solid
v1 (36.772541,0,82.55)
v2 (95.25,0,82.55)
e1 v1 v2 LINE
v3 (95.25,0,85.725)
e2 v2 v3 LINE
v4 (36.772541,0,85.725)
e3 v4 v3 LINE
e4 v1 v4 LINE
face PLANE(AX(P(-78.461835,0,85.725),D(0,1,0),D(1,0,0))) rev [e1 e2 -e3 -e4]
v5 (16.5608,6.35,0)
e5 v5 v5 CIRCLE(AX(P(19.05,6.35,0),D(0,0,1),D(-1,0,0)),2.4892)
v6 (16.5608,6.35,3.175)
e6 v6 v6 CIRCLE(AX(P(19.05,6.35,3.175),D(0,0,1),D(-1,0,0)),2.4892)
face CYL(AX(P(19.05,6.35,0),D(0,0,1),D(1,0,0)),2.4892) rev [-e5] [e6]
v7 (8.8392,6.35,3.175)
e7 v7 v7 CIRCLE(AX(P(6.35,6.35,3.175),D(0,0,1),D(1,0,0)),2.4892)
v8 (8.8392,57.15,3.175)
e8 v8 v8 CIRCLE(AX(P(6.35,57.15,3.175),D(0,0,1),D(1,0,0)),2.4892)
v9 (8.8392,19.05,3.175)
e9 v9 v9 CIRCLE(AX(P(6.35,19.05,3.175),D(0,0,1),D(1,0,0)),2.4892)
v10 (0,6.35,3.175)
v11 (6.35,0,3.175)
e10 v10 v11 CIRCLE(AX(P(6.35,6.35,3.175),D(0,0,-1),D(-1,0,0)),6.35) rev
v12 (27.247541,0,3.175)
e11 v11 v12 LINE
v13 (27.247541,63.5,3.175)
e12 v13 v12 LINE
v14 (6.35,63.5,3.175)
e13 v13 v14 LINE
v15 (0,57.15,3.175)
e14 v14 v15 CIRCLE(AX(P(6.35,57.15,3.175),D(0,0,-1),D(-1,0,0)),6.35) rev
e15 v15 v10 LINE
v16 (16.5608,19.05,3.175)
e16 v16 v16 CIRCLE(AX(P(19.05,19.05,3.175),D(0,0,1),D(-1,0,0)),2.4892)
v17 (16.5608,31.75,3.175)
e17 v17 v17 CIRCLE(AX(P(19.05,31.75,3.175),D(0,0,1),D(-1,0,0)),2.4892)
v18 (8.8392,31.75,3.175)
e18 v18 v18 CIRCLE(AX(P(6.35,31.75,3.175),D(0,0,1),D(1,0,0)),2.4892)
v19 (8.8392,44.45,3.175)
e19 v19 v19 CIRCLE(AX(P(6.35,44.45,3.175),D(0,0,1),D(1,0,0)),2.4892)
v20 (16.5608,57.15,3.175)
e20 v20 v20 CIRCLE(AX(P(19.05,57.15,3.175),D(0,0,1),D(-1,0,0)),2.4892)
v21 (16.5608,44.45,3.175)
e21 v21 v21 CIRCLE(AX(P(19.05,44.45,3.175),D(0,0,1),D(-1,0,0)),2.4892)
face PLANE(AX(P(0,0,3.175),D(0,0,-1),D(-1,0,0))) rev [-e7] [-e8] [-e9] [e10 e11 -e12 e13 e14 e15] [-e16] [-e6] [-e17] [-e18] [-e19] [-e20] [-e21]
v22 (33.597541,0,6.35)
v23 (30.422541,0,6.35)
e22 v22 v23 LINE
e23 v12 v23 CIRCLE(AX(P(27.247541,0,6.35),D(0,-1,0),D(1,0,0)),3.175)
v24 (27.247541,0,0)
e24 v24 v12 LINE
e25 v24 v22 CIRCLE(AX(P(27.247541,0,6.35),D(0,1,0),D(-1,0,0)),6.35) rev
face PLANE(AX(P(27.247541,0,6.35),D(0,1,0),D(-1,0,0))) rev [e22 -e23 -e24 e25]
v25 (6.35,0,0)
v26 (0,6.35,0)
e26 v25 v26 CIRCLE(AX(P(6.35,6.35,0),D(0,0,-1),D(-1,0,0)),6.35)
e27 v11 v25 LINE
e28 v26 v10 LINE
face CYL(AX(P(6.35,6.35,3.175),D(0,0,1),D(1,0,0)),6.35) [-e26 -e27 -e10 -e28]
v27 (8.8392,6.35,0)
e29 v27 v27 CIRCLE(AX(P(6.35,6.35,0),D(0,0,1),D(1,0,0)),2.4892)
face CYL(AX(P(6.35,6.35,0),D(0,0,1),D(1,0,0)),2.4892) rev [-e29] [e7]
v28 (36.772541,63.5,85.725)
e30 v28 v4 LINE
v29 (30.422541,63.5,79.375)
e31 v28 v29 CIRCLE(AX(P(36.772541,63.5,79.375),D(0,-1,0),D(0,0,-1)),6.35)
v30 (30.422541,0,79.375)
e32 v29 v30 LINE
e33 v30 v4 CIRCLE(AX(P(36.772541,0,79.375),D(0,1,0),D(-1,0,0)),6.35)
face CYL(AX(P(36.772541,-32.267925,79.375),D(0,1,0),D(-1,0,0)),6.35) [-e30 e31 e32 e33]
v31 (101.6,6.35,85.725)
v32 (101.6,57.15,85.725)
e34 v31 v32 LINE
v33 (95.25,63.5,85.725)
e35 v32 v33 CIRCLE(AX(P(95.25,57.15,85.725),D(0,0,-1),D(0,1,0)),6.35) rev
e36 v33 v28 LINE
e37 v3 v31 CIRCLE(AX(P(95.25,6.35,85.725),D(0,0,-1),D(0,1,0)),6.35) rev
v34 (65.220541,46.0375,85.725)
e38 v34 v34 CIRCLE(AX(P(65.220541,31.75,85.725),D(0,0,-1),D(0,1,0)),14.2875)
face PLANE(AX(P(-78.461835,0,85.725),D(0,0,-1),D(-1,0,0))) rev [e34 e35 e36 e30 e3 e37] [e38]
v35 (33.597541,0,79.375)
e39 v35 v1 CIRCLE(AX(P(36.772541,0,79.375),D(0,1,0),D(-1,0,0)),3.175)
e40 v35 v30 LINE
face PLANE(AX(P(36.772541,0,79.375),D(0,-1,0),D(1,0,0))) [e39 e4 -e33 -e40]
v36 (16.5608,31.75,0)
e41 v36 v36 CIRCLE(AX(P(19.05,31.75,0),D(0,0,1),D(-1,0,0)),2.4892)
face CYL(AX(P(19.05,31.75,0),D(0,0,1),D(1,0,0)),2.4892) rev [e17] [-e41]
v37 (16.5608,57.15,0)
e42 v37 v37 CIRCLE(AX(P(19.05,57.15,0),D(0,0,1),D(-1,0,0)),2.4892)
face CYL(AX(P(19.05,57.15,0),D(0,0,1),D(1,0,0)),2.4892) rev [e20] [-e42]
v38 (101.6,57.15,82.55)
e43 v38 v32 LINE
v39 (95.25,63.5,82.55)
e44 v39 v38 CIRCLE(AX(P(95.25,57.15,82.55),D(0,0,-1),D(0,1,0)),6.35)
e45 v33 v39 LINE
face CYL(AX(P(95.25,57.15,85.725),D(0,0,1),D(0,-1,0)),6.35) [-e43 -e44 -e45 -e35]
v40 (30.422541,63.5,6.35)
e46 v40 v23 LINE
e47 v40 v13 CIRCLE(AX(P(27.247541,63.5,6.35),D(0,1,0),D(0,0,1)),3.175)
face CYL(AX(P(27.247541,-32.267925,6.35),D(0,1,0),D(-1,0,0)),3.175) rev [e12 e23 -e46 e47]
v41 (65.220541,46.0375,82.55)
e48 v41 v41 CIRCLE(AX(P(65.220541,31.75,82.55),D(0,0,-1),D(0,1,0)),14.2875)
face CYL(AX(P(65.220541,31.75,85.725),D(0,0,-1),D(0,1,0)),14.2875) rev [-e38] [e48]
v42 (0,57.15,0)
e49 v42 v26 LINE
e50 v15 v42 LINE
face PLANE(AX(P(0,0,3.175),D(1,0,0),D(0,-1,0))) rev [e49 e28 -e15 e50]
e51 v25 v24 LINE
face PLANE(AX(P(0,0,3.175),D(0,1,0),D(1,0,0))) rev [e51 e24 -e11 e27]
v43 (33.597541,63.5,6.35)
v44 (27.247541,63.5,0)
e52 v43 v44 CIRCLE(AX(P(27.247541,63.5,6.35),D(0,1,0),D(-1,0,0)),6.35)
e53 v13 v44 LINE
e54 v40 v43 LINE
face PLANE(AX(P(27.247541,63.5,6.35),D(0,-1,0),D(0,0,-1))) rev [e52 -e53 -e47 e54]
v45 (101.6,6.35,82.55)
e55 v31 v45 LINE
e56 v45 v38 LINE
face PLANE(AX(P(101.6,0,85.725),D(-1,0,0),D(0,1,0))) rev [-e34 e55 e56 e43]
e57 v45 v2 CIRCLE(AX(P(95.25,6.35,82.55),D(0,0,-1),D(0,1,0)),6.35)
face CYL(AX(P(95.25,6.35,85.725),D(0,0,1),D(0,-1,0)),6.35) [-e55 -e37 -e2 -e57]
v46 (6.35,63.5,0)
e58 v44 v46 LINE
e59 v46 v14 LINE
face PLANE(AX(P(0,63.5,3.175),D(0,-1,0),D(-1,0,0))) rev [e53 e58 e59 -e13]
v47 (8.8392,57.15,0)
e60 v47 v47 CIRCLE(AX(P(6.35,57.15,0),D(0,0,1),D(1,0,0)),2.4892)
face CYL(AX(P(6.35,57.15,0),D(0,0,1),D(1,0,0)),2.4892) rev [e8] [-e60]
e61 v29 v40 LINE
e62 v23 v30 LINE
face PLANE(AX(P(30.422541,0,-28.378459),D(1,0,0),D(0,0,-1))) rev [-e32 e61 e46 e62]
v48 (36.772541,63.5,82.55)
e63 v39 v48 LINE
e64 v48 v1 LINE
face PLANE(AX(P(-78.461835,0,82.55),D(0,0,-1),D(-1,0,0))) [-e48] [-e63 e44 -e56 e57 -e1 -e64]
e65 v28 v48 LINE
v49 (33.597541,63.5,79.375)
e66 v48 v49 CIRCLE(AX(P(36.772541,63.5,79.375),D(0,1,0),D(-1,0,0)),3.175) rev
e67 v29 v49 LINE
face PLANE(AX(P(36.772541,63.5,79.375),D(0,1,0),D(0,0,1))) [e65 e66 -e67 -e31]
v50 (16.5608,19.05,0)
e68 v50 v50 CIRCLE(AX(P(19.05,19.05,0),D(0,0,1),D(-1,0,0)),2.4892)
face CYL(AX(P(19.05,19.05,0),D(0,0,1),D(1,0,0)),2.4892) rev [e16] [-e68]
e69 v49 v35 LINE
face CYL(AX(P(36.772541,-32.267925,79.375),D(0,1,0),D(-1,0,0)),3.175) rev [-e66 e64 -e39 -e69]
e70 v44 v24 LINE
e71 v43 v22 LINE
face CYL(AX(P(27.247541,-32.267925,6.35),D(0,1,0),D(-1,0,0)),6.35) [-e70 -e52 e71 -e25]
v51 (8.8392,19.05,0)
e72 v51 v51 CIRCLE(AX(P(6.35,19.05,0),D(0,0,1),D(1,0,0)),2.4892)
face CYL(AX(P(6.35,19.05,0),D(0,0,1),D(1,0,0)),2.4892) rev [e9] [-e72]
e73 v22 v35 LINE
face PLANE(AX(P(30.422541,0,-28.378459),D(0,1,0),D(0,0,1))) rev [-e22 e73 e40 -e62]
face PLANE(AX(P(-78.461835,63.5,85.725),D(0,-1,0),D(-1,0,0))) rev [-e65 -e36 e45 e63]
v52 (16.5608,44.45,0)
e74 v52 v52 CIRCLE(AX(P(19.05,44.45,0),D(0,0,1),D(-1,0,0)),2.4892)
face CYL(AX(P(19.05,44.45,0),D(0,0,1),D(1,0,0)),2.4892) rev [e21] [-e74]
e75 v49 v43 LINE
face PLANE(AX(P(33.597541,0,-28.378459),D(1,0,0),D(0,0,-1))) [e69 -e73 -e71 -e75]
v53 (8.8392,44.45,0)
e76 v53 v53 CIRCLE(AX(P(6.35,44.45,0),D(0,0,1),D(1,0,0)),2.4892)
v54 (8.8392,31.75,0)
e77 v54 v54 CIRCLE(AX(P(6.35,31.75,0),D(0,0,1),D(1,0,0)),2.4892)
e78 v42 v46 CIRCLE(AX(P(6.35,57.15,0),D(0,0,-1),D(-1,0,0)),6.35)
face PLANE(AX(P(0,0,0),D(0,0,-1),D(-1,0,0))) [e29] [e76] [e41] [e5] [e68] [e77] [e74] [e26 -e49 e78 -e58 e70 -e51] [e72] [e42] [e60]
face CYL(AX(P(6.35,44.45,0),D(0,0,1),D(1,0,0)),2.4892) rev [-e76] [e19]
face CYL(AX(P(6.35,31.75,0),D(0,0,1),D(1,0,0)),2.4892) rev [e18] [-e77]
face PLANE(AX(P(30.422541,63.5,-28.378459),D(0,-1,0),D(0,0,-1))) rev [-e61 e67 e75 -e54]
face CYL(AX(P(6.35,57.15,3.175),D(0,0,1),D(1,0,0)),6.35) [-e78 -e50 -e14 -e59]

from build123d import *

# Parameters (mm, degrees)
SKETCH1_W           = 101.6
SKETCH1_H           = 63.5
BOSS_EXTRUDE1_DEPTH = 3.175
JOG1_DEPTH          = 63.5
JOG1_2_DEPTH        = 63.5
SKETCH7_R           = 14.2875
CUT_EXTRUDE1_DEPTH  = 146.496778315
SKETCH9_R           = 2.4892
CUT_EXTRUDE2_DEPTH  = 146.496778315
FILLET1_R           = 6.35


# Read off the part's stored shape, not the designer's step: Jog1
with BuildPart() as part:
    # Sketch1 → Boss-Extrude1 (new body)
    with BuildSketch(Plane.XY):
        with Locations((50.8, 31.75)):
            Rectangle(SKETCH1_W, SKETCH1_H)
    extrude(amount=BOSS_EXTRUDE1_DEPTH)

    # Jog1 outline → Jog1 (cut)
    with BuildSketch(Plane(origin=(0, 0, 0), x_dir=(1, 0, 0), z_dir=(0, 1, 0))):
        with BuildLine():
            ThreePointArc((27.247541247, 0), (30.422541247, -0.850738686), (32.746802561, -3.175))
            Line((32.746802561, -3.175), (101.6, -3.175))
            Line((101.6, -3.175), (101.6, 0))
            Line((101.6, 0), (27.247541247, 0))
        make_face()
    extrude(amount=JOG1_DEPTH, mode=Mode.SUBTRACT)

    # Jog1 2 outline → Jog1 2 (add)
    with BuildSketch(Plane(origin=(0, 0, 0), x_dir=(1, 0, 0), z_dir=(0, 1, 0))):
        with BuildLine():
            ThreePointArc((36.772541247, -82.55), (34.527477217, -81.62006403), (33.597541247, -79.375))
            Line((33.597541247, -79.375), (33.597541247, -6.35))
            ThreePointArc((33.597541247, -6.35), (33.381170244, -4.706499064), (32.746802561, -3.175))
            Line((32.746802561, -3.175), (27.247541247, -3.175))
            ThreePointArc((27.247541247, -3.175), (29.492605277, -4.10493597), (30.422541247, -6.35))
            Line((30.422541247, -6.35), (30.422541247, -79.375))
            ThreePointArc((30.422541247, -79.375), (32.282413186, -83.865128061), (36.772541247, -85.725))
            Line((36.772541247, -85.725), (101.6, -85.725))
            Line((101.6, -85.725), (101.6, -82.55))
            Line((101.6, -82.55), (36.772541247, -82.55))
        make_face()
    extrude(amount=JOG1_2_DEPTH)

    # Sketch7 → Cut-Extrude1 (cut, through all)
    with BuildSketch(Plane(origin=(0, 0, 82.55), x_dir=(-1, 0, 0), z_dir=(0, 0, -1))):
        with Locations(Location((-65.220541247, 31.75, 0), (0, 0, 90))):
            Circle(SKETCH7_R)
    extrude(amount=-CUT_EXTRUDE1_DEPTH, mode=Mode.SUBTRACT)

    # Sketch9 → Cut-Extrude2 (cut, through all)
    with BuildSketch(Plane.XY.offset(3.175)):
        with Locations((6.35, 57.15)):
            Circle(SKETCH9_R)
        with Locations(Location((19.05, 57.15, 0), (0, 0, 180))):
            Circle(SKETCH9_R)
        with Locations((6.35, 44.45)):
            Circle(SKETCH9_R)
        with Locations(Location((19.05, 44.45, 0), (0, 0, 180))):
            Circle(SKETCH9_R)
        with Locations((6.35, 31.75)):
            Circle(SKETCH9_R)
        with Locations(Location((19.05, 31.75, 0), (0, 0, 180))):
            Circle(SKETCH9_R)
        with Locations((6.35, 19.05)):
            Circle(SKETCH9_R)
        with Locations(Location((19.05, 19.05, 0), (0, 0, 180))):
            Circle(SKETCH9_R)
        with Locations((6.35, 6.35)):
            Circle(SKETCH9_R)
        with Locations(Location((19.05, 6.35, 0), (0, 0, 180))):
            Circle(SKETCH9_R)
    extrude(amount=-CUT_EXTRUDE2_DEPTH, mode=Mode.SUBTRACT)

    # Fillet1
    fillet1_edges = [part.edges().sort_by_distance(p)[0] for p in [
        (101.6, 63.5, 84.1375),
        (101.6, 0, 84.1375),
        (0, 0, 1.5875),
        (0, 63.5, 1.5875),
    ]]
    fillet(fillet1_edges, radius=FILLET1_R)


solid = part.part
